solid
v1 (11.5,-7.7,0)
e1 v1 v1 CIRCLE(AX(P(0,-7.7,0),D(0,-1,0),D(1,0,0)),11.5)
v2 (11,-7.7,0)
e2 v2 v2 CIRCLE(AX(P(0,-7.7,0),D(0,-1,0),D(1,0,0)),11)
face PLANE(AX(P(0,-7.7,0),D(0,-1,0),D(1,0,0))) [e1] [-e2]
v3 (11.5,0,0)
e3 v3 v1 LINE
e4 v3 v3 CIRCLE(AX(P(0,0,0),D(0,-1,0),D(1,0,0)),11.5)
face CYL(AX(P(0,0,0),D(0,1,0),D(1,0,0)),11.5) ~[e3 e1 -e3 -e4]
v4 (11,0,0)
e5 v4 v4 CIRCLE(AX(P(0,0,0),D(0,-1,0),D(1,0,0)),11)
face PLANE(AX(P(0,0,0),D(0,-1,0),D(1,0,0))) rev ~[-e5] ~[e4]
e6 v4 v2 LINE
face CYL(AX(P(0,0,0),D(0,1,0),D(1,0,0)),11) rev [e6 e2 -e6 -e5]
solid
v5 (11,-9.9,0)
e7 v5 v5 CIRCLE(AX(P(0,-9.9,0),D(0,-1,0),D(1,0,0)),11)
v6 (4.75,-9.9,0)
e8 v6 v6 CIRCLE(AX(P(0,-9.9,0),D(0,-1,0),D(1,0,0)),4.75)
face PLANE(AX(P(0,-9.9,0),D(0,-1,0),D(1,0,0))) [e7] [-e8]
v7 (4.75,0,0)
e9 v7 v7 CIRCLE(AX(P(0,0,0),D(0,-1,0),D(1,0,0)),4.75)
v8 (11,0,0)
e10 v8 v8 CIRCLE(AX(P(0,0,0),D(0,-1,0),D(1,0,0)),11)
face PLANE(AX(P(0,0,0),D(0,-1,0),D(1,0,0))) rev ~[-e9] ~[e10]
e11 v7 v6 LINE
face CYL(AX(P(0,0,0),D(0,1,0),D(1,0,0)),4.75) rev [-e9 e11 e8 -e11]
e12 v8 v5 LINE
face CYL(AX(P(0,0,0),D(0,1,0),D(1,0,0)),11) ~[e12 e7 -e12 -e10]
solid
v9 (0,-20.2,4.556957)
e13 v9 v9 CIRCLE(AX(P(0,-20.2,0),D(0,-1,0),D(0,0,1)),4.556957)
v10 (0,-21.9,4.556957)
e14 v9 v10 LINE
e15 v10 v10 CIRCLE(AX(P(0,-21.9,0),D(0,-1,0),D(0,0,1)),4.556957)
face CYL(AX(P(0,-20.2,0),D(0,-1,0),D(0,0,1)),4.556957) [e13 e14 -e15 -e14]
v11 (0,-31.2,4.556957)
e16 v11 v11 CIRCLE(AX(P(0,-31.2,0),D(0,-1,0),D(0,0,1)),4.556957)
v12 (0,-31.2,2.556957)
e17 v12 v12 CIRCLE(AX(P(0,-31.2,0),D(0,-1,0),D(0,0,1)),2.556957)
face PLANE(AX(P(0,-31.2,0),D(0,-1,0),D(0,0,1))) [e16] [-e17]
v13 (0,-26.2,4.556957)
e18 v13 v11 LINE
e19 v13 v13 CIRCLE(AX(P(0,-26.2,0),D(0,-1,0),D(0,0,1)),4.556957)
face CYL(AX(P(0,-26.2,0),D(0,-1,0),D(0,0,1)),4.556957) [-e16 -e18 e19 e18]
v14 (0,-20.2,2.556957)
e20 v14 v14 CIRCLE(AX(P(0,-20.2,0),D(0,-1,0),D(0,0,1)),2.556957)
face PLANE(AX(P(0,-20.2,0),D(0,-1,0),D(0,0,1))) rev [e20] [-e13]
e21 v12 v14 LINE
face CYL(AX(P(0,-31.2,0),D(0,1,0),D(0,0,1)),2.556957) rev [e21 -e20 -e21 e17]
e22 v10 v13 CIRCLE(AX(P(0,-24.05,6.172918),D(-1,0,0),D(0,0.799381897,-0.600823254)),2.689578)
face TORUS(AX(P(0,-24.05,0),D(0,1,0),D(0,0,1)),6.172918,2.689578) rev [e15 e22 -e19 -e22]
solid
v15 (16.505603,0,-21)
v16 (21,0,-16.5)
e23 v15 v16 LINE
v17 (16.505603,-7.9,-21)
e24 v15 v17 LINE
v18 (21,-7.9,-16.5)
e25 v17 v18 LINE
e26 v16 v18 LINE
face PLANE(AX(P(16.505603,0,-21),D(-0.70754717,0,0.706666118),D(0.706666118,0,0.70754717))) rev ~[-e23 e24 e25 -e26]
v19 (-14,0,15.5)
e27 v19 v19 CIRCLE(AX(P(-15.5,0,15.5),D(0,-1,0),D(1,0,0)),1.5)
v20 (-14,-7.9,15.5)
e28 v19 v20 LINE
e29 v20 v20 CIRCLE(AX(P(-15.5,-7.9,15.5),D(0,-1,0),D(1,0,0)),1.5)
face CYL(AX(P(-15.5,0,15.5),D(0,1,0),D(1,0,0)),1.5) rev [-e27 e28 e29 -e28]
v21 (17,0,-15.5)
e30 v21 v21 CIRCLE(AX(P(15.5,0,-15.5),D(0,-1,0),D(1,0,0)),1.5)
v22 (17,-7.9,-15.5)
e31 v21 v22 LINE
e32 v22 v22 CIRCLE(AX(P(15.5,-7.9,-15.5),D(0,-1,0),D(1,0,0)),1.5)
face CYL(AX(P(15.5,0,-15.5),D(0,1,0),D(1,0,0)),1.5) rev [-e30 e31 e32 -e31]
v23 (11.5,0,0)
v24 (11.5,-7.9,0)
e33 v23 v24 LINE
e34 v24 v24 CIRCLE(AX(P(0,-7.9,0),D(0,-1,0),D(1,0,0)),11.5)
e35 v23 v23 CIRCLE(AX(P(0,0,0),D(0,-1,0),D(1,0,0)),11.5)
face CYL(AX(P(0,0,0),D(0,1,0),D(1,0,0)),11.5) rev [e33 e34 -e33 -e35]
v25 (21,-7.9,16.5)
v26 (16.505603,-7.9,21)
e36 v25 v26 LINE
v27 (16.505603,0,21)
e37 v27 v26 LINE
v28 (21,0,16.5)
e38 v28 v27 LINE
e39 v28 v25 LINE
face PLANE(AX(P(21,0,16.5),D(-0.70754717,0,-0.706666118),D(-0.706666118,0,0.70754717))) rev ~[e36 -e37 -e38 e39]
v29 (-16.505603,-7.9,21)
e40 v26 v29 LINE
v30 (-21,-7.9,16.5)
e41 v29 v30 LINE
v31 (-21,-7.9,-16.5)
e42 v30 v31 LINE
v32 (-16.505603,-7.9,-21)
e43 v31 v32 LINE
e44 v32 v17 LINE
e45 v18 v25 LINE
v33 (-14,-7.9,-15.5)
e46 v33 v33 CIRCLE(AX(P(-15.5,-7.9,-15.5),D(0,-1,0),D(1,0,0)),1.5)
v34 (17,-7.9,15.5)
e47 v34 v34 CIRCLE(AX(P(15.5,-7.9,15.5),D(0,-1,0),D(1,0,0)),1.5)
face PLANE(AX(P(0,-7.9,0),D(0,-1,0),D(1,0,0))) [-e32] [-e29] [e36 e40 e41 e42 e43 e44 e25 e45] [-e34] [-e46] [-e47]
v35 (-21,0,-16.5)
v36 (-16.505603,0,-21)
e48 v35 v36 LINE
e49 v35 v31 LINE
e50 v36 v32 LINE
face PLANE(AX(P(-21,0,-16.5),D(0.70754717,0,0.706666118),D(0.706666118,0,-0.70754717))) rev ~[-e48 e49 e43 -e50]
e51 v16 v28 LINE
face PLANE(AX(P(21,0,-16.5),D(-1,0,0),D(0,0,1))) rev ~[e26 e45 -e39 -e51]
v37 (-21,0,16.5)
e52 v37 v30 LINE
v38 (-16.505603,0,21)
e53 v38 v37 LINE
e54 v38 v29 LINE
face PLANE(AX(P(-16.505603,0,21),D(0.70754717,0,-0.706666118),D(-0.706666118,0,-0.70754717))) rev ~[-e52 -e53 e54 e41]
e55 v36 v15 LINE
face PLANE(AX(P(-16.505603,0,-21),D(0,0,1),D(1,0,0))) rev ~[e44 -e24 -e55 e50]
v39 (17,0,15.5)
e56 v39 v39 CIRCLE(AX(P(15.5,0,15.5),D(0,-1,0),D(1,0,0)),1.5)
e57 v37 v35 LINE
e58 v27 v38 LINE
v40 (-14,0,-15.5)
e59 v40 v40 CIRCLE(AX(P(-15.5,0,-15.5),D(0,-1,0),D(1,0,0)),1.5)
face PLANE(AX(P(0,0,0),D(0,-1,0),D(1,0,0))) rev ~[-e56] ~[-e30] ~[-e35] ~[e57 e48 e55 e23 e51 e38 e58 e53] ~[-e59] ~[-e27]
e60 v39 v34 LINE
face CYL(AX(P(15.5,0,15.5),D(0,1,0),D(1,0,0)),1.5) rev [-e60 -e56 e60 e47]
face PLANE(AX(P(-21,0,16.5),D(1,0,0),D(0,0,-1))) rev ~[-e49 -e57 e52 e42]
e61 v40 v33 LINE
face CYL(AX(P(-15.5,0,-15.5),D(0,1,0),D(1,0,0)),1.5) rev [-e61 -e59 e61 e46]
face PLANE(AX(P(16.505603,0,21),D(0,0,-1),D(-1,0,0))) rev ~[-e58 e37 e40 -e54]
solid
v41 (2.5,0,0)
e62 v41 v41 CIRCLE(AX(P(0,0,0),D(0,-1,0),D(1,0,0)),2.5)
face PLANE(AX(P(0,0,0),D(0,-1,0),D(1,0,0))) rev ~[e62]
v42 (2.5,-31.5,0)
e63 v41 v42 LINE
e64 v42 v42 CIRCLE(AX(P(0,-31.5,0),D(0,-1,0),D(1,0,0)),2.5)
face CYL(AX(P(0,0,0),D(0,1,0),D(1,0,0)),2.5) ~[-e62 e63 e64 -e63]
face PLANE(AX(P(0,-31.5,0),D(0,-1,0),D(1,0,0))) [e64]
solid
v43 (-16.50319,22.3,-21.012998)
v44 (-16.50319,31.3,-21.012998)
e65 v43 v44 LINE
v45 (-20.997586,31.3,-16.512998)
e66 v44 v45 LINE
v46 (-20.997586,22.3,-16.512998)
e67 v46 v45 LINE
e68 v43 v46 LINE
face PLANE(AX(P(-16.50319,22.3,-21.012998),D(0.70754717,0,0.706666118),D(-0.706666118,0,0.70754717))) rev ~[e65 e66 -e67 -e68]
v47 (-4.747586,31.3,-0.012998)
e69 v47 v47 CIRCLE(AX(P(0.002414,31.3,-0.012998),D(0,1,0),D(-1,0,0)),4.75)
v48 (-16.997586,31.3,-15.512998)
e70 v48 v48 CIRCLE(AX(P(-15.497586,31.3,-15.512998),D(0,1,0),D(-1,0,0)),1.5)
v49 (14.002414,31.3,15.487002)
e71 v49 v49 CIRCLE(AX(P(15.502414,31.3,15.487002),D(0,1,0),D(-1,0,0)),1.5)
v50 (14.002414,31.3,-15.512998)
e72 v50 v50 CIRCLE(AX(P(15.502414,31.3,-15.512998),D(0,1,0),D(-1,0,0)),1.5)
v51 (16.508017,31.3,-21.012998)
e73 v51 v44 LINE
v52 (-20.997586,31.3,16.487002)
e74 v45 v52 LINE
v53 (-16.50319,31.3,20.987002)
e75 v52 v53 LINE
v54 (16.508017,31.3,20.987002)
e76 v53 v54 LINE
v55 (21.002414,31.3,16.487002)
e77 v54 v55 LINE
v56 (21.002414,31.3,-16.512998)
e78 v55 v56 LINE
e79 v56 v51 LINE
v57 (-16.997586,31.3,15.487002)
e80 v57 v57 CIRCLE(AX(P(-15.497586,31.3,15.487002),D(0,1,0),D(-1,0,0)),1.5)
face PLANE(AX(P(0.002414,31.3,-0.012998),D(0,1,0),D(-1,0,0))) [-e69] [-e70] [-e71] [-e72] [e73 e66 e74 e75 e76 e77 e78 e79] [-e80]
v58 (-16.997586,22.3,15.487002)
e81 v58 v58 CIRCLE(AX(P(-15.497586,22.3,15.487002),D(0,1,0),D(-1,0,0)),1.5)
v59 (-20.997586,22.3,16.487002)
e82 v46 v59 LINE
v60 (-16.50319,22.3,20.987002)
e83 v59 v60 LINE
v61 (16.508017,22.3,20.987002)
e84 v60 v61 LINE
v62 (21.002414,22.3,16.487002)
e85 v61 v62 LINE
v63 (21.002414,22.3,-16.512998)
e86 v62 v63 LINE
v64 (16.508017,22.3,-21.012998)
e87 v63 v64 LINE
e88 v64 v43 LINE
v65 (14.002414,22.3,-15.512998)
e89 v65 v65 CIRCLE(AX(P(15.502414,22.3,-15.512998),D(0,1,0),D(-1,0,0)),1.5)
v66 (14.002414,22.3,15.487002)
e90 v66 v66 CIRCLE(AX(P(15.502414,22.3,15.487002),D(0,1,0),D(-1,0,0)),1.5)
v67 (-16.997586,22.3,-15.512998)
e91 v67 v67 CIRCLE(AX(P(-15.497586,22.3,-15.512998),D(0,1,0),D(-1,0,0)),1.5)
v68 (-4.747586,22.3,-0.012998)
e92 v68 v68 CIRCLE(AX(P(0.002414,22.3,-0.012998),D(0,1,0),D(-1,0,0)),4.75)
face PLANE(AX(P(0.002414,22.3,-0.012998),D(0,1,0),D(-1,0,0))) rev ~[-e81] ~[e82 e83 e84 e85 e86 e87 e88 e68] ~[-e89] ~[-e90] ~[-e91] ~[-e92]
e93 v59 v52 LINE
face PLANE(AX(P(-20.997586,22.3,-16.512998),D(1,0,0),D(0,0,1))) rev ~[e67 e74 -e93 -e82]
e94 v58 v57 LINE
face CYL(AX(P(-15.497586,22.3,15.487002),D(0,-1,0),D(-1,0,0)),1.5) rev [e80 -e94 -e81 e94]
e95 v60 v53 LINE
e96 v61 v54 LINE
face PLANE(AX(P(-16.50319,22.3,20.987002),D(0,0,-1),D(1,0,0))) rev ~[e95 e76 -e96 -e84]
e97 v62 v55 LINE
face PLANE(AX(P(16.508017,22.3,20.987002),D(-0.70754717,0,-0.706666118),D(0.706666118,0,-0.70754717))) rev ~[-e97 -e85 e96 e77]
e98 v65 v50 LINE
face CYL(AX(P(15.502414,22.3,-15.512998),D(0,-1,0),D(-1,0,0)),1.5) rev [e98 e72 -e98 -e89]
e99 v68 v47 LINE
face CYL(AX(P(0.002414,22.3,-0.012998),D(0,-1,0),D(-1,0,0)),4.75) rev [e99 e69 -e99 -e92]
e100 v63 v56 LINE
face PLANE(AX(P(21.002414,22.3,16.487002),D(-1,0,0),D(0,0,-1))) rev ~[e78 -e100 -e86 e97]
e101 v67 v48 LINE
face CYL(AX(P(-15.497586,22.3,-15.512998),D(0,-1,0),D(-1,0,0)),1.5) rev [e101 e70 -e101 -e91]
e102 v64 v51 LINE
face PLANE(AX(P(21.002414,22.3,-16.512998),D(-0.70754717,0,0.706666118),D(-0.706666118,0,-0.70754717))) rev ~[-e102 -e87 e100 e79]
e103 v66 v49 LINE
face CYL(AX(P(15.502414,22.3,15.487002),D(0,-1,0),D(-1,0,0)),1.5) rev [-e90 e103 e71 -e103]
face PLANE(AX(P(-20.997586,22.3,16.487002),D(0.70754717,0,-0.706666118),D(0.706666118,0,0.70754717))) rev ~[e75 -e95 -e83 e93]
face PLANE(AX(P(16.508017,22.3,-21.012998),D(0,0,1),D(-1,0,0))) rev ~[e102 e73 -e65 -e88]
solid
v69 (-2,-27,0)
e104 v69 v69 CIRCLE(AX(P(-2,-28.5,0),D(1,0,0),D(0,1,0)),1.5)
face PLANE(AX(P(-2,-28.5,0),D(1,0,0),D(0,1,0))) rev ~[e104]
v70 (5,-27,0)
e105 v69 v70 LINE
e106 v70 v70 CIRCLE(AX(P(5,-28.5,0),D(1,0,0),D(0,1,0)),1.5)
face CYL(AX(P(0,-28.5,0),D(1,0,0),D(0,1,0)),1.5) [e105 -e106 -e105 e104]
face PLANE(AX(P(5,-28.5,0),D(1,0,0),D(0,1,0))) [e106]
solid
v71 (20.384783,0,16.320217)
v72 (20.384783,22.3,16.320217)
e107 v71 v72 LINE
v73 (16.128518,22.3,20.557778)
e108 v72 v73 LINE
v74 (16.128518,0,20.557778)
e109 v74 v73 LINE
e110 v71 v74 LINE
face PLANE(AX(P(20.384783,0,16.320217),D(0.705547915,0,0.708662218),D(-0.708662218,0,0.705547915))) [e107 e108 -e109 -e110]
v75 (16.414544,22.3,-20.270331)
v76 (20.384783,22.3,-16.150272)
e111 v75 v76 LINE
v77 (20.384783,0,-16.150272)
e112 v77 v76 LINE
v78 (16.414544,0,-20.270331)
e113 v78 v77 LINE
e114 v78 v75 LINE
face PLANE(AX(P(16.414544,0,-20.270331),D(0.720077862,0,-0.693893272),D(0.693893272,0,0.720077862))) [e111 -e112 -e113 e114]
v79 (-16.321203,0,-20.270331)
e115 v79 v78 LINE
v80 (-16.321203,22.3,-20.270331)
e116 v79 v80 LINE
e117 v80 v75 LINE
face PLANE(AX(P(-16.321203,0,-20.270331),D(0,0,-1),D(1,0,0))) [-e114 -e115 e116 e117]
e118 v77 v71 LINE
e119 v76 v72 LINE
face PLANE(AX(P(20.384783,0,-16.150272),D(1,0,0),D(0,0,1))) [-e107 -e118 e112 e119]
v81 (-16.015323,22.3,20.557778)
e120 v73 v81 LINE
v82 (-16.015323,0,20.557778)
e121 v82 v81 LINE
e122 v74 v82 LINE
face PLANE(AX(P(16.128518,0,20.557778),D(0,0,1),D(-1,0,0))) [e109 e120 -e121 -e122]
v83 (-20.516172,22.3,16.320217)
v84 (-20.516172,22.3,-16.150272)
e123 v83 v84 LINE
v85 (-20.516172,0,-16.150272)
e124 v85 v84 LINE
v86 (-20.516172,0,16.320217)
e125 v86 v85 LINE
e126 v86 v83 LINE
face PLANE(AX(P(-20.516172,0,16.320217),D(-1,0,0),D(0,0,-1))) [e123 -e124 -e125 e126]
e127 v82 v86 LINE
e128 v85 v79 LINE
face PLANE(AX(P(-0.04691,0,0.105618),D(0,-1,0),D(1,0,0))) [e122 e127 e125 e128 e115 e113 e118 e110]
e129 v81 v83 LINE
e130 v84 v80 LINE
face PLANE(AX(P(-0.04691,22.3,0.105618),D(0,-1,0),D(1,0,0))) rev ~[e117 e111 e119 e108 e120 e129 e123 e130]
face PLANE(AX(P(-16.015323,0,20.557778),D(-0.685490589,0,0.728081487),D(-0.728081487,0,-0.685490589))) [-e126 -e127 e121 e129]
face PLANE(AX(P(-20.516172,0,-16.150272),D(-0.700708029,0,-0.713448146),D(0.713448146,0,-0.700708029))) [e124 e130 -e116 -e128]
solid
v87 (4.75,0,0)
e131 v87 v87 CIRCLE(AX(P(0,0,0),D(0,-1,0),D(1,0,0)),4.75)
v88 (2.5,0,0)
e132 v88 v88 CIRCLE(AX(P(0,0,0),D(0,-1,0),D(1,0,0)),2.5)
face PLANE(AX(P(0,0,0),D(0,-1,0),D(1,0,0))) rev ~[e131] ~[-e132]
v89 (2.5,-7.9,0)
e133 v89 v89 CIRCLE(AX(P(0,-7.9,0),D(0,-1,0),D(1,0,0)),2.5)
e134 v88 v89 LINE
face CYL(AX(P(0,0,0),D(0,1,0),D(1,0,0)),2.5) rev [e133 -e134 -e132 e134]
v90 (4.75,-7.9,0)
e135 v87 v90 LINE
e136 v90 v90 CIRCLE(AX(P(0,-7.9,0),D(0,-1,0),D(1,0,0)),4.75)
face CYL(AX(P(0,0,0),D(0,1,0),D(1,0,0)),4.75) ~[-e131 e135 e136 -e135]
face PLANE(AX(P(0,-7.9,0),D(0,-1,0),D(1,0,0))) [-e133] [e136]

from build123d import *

# Parameters (mm, degrees)
F0_R           = 1.5
F0_R_2         = 11.5
F1_DEPTH       = 7.9
F0_R_3         = 11
F0_R_4         = 4.75
F2_DEPTH       = 9.9
F0_R_5         = 2.5
F3_DEPTH       = 7.9
F4_DEPTH       = 31.5
F5_DEPTH       = 7.7
F7_DEPTH       = 22.3
F8_R           = 1.5
F8_R_2         = 4.75
F9_DEPTH       = 9
F12_R          = 1.5
F13_DEPTH      = 5
F13_DEPTH_BACK = 2


# Not quite as in the source:
# - a feature names something its author has since deleted; it is built from what else it names


with BuildPart() as f1:
    # F0 (on Front) → F1 (new body)
    with BuildSketch(Plane.XZ):
        Polygon((16.5056034888, 21), (-16.5056034888, 21), (-21, 16.5), (-21, -16.5), (-16.5056034888, -21), (16.5056034888, -21), (21, -16.5), (21, 16.5), align=None)
        with Locations((-15.5, -15.5)):
            Circle(F0_R, mode=Mode.SUBTRACT)
        with Locations((15.5, -15.5)):
            Circle(F0_R, mode=Mode.SUBTRACT)
        with Locations((-15.5, 15.5)):
            Circle(F0_R, mode=Mode.SUBTRACT)
        Circle(F0_R_2, mode=Mode.SUBTRACT)
        with Locations((15.5, 15.5)):
            Circle(F0_R, mode=Mode.SUBTRACT)
    extrude(amount=F1_DEPTH)


with BuildPart() as f2:
    # F0 (on Front) → F2 (new body)
    with BuildSketch(Plane.XZ):
        Circle(F0_R_3)
        Circle(F0_R_4, mode=Mode.SUBTRACT)
    extrude(amount=F2_DEPTH)


with BuildPart() as f3:
    # F0 (on Front) → F3 (new body)
    with BuildSketch(Plane.XZ):
        Circle(F0_R_4)
        Circle(F0_R_5, mode=Mode.SUBTRACT)
    extrude(amount=F3_DEPTH)


with BuildPart() as f4:
    # F0 (on Front) → F4 (new body)
    with BuildSketch(Plane.XZ):
        Circle(F0_R_5)
    extrude(amount=F4_DEPTH)


with BuildPart() as f5:
    # F0 (on Front) → F5 (new body)
    with BuildSketch(Plane.XZ):
        Circle(F0_R_2)
        Circle(F0_R_3, mode=Mode.SUBTRACT)
    extrude(amount=F5_DEPTH)


with BuildPart() as f7:
    # F6 (on Front) → F7 (new body)
    with BuildSketch(Plane.XZ):
        Polygon((20.3847829252, 16.3202174008), (16.1285176873, 20.5577779561), (-16.0153234008, 20.5577779561), (-20.5161720514, 16.3202174008), (-20.5161720514, -16.15027152), (-16.3212027401, -20.2703308314), (16.4145436138, -20.2703308314), (20.3847829252, -16.15027152), align=None)
    extrude(amount=-F7_DEPTH)


with BuildPart() as f9:
    # F8 (on face) → F9 (new body)
    with BuildSketch(Plane(origin=(0, 22.3, 0), x_dir=(-1, 0, 0), z_dir=(0, 1, 0))):
        Polygon((16.5031898472, 20.9870020965), (-16.5080171304, 20.9870020965), (-21.0024136416, 16.4870020965), (-21.0024136416, -16.5129979035), (-16.5080171304, -21.0129979035), (16.5031898472, -21.0129979035), (20.9975863584, -16.5129979035), (20.9975863584, 16.4870020965), align=None)
        with Locations((-15.5024136416, -15.5129979035)):
            Circle(F8_R, mode=Mode.SUBTRACT)
        with Locations((15.4975863584, -15.5129979035)):
            Circle(F8_R, mode=Mode.SUBTRACT)
        with Locations((-0.0024136416, -0.0129979035)):
            Circle(F8_R_2, mode=Mode.SUBTRACT)
        with Locations((-15.5024136416, 15.4870020965)):
            Circle(F8_R, mode=Mode.SUBTRACT)
        with Locations((15.4975863584, 15.4870020965)):
            Circle(F8_R, mode=Mode.SUBTRACT)
    extrude(amount=F9_DEPTH)


with BuildPart() as f11:
    # F10 (on Right) → F11 (revolve)
    with BuildSketch(Plane.YZ):
        with BuildLine():
            Line((-31.2, 4.5569573045), (-31.2, 2.5569573045))
            Line((-31.2, 2.5569573045), (-20.2, 2.5569573045))
            Line((-20.2, 2.5569573045), (-20.2, 4.5569573045))
            Line((-20.2, 4.5569573045), (-21.9, 4.5569573045))
            ThreePointArc((-21.9, 4.5569573045), (-24.05, 3.4833402932), (-26.2, 4.5569573045))
            Line((-26.2, 4.5569573045), (-31.2, 4.5569573045))
        make_face()
    revolve(axis=Axis((0, -21.6135401279, 0), (0, -1, 0)))


with BuildPart() as f13:
    # F12 (on Right) → F13 (new body, two sides)
    with BuildSketch(Plane.YZ) as f13_sk:
        with Locations((-28.5, 0)):
            Circle(F12_R)
    extrude(amount=F13_DEPTH)
    extrude(f13_sk.sketch, amount=-F13_DEPTH_BACK)


solid = Compound([f1.part, f2.part, f3.part, f4.part, f5.part, f7.part, f9.part, f11.part, f13.part])
